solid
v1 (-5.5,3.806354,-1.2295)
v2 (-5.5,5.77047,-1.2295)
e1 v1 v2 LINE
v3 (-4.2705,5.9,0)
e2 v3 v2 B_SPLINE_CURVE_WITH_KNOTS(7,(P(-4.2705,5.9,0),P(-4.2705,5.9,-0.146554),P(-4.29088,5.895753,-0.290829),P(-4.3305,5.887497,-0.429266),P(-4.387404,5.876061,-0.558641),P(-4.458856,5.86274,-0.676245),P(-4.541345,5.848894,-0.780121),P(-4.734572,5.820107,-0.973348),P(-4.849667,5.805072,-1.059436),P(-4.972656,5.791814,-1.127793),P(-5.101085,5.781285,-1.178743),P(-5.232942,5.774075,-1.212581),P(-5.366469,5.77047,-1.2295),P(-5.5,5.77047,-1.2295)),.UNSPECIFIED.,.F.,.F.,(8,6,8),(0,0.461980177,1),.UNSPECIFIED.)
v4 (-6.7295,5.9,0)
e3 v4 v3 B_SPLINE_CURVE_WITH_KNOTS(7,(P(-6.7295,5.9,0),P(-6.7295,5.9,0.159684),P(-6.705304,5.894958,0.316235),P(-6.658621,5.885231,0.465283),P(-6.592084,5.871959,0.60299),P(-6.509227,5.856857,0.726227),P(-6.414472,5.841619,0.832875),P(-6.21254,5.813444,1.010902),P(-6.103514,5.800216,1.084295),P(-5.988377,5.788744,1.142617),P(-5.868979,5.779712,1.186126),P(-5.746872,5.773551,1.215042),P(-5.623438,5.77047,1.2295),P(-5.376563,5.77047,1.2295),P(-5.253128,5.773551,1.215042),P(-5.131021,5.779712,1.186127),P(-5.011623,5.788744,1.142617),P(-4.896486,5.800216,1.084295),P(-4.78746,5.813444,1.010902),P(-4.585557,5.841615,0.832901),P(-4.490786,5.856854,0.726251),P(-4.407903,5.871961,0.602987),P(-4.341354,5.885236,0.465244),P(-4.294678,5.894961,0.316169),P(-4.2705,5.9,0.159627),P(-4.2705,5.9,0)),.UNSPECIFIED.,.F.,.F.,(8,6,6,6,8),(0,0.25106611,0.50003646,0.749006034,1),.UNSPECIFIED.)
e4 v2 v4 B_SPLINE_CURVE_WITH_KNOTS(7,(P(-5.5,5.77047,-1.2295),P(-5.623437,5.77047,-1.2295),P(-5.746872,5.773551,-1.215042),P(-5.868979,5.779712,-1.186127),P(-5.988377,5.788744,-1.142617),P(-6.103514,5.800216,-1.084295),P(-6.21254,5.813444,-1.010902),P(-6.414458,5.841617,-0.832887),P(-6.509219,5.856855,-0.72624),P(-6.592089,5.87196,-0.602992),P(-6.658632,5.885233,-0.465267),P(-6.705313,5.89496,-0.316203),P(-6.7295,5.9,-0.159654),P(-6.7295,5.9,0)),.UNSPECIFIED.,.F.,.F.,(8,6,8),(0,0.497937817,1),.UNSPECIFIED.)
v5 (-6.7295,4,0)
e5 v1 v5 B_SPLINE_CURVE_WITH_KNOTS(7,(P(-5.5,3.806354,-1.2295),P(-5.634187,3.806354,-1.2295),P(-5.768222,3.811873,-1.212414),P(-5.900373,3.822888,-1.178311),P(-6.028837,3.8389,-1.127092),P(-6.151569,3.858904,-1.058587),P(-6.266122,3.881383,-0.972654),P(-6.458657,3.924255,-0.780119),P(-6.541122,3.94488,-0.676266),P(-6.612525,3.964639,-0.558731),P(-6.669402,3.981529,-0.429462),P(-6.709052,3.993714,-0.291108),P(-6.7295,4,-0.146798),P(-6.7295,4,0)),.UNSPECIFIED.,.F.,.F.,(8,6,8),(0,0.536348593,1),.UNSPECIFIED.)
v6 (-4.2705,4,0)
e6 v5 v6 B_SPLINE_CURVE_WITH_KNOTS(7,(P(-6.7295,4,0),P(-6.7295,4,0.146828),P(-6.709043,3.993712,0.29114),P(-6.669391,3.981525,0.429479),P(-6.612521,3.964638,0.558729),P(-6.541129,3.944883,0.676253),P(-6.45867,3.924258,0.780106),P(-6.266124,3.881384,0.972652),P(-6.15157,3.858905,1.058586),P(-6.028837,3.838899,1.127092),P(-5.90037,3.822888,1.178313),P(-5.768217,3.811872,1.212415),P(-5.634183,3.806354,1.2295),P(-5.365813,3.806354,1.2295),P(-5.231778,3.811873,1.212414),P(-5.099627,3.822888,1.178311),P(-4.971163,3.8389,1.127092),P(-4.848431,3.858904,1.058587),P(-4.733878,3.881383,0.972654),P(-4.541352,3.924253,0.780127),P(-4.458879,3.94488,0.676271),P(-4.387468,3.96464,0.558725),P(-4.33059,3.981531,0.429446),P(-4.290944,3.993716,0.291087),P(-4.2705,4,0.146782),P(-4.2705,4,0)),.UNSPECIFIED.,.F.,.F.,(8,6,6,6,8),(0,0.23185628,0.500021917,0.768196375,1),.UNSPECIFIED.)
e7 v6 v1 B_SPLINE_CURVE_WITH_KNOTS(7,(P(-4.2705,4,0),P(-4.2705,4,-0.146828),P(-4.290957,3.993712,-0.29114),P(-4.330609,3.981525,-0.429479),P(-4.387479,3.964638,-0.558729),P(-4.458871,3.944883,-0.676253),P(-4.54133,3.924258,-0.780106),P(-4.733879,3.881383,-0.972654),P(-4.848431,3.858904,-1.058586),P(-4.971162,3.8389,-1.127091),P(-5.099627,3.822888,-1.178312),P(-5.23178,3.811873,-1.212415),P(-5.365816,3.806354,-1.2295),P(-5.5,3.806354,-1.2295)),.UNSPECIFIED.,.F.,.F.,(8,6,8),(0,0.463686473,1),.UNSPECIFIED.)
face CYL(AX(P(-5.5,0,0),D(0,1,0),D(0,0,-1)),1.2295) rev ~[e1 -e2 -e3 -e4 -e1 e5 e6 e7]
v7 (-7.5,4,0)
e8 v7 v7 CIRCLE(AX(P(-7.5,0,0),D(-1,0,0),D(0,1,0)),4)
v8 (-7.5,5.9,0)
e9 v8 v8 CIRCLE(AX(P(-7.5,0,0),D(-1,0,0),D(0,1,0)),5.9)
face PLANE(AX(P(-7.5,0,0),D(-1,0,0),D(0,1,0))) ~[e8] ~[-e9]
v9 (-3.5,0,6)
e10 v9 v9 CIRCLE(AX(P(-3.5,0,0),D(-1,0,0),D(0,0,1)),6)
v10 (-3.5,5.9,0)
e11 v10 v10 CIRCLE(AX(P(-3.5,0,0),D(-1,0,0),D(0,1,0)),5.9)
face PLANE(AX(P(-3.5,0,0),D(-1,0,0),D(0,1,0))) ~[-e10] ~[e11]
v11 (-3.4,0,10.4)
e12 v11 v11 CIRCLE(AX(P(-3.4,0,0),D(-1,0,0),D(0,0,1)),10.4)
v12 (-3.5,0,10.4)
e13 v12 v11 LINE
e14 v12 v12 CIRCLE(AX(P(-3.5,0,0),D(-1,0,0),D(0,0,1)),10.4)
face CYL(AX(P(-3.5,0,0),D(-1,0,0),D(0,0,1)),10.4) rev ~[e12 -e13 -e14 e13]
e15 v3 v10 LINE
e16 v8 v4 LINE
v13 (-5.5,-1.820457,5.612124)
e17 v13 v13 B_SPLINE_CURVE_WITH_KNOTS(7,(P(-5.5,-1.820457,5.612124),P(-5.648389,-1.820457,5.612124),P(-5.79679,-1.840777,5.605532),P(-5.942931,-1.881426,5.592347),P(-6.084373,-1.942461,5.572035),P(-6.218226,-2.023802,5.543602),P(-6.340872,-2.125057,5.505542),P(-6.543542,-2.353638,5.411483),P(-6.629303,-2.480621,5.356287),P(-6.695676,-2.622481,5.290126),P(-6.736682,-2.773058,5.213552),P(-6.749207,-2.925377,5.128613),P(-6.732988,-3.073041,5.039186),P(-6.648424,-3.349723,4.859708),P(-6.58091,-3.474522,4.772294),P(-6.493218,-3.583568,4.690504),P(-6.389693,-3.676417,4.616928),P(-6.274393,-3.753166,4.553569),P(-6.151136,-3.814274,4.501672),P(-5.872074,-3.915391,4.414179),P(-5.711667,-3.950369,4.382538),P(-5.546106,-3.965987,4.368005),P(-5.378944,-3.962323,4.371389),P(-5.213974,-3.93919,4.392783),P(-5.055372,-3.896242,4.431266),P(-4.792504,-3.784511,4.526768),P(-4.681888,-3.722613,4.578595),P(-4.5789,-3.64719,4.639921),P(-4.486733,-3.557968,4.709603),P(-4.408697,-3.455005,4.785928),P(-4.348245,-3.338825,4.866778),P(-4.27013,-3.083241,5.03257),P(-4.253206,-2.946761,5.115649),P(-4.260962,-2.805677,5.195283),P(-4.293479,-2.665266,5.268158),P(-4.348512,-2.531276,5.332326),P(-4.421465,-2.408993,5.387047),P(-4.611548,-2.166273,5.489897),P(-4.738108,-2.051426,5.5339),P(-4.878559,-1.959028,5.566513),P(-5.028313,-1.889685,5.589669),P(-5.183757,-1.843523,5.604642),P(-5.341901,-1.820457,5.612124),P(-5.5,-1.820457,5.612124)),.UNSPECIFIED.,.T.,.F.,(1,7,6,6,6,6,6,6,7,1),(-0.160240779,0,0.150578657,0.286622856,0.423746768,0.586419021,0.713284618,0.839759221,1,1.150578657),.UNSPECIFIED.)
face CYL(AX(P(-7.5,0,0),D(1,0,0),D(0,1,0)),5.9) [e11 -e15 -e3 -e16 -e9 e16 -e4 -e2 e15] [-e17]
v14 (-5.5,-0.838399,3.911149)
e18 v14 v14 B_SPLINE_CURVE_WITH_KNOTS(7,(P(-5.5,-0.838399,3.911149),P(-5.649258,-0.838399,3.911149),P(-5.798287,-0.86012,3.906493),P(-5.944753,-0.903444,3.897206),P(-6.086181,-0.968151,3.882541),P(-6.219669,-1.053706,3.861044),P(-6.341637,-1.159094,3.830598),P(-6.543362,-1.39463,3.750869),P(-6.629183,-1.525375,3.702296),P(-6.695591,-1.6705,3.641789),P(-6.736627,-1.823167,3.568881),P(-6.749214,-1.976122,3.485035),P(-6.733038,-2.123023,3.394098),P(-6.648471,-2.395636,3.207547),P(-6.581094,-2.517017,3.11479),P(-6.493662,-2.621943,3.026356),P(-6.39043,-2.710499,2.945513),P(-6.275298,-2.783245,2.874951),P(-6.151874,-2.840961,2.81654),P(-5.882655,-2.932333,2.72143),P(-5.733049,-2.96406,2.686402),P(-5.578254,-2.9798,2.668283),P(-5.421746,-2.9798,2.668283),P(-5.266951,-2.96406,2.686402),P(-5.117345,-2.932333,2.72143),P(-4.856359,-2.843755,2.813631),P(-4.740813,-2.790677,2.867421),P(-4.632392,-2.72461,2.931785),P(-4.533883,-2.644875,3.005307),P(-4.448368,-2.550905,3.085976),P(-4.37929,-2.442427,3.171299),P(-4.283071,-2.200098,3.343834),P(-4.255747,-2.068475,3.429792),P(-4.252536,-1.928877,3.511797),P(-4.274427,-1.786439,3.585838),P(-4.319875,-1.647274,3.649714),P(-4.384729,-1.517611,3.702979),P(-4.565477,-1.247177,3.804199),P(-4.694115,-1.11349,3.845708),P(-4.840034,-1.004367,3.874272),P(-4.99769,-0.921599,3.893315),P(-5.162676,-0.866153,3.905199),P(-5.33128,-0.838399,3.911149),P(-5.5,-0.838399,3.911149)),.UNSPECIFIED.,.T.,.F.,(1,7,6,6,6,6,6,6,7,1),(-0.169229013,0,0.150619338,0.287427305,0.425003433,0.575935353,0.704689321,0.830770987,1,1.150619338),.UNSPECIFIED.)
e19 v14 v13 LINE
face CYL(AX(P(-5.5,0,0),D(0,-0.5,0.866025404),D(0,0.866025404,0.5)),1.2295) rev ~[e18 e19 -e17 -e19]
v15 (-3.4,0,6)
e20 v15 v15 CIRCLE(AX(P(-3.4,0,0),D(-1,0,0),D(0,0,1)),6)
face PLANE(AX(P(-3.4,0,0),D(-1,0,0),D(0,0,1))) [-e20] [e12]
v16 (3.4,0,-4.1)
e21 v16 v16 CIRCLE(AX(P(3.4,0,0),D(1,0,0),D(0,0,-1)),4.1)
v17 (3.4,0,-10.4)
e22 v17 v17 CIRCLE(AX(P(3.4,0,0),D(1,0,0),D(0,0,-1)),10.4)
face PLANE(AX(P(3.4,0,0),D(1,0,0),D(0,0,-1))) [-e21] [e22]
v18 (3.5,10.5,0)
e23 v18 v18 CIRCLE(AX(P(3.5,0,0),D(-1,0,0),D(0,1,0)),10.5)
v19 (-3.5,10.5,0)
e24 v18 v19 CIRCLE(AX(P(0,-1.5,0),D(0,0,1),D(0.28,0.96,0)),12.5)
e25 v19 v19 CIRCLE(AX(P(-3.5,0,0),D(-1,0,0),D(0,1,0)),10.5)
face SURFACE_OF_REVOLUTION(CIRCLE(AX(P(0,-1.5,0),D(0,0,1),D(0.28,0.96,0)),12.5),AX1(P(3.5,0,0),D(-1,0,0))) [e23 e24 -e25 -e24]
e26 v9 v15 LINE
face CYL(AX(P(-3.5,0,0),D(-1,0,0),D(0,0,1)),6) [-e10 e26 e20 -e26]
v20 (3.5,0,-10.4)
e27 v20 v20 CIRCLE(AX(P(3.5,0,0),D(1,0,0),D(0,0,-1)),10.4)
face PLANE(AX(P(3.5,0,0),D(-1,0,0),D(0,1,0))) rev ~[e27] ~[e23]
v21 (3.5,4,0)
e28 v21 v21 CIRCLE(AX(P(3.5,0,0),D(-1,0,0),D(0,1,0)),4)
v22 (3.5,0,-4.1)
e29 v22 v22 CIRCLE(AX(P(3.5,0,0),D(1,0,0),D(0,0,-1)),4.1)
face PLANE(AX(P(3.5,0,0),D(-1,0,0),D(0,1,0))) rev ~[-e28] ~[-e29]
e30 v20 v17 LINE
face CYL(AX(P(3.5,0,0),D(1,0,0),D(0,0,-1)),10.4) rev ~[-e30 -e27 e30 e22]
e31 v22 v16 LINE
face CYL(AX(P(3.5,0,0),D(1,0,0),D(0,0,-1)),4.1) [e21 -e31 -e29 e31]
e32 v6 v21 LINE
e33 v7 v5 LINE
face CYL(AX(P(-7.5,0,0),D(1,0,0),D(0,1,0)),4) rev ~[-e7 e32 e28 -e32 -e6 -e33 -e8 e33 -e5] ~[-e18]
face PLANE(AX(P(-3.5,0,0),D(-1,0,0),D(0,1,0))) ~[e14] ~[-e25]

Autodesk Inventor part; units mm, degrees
ref_plane "YZ Plane" through (0, 0, 0) normal (1, 0, 0) x (0, 1, 0)
ref_plane "XZ Plane" through (0, 0, 0) normal (0, 1, 0) x (-1, 0, 0)
ref_plane "XY Plane" through (0, 0, 0) normal (0, 0, 1) x (1, 0, 0)
sketch "Sketch2" plane through (0, 0, 0) normal (0, 0, 1) x (1, 0, 0)
  arc A0 (3.5, 10.5) -> (-3.5, 10.5) centre (0, -1.5) ccw
  line L0 (3.5, 10.5) -> (3.5, 4)
  line L1 (3.5, 0) -> (-7.5, 0)
  line L2 (-7.5, 5.9) -> (-3.5, 5.9)
  line L3 (-3.5, 5.9) -> (-3.5, 10.5)
  line L4 (-7.5, 4) -> (3.5, 4)
  line L5 (-7.5, 4) -> (-7.5, 5.9)
  point P0 (0, 0)
  point P1 (0, 11)
  point P2 (-7.5, 4.95)
  dimension "d1" = 11
  dimension "d2" = 3.5
  dimension "d3" = 10.5
  dimension "d4" = 3.5
  dimension "d5" = 5.9
  dimension "d6" = 11
  dimension "d7" = 4
revolve "Revolution1" add sketch "Sketch2" angle 360 about axis through (3.5, 0, 0) along (-1, 0, 0)
sketch "Sketch3" plane through (0, 0, 0) normal (0, 1, 0) x (-1, 0, 0)
  line L0 (7.5, 5.9) -> (7.5, -5.9) projected
  line L1 (3.5, 5.9) -> (3.5, -5.9) projected
  point P0 (0, 0)
  point P1 (5.5, 0)
  dimension "d9" = 2
hole "Hole1" at (-5.5, 0, 0) direction (0, 1, 0) diameter 2.459 end through all thread size "M3x0.5" class "6H" standard "ISO Metric profile"
pattern_circular "Circular Pattern1" count 2 over 120 about axis through (-2, 0, 0) along (1, 0, 0) of "Hole1"
sketch "Sketch4" plane through (-3.5, 0, 0) normal (-1, 0, 0) x (0, 0, 1)
  circle A0 centre (0, 0) radius 5.9 projected
  circle A1 centre (0, 0) radius 10.5 projected
  circle A2 centre (0, 0) radius 6
  circle A3 centre (0, 0) radius 10.4
  point P0 (0, 0)
  dimension "d20" = 0.1
  dimension "d21" = 0.1
sketch "Sketch4 outline for Extrusion1" plane through (-3.5, 0, 0) normal (-1, 0, 0) x (0, 0, 1)
  circle A0 centre (0, 0) radius 10.4
  circle A1 centre (0, 0) radius 6
extrude "Extrusion1" cut sketch "Sketch4 outline for Extrusion1" against normal blind 0.1
sketch "Sketch5" plane through (3.5, 0, 0) normal (1, 0, 0) x (0, 0, -1)
  circle A0 centre (0, 0) radius 10.5 projected
  circle A1 centre (0, 0) radius 4 projected
  circle A2 centre (0, 0) radius 10.4
  circle A3 centre (0, 0) radius 4.1
  point P0 (0, 0)
  dimension "d24" = 0.1
  dimension "d25" = 0.1
sketch "Sketch5 outline for Extrusion2" plane through (3.5, 0, 0) normal (1, 0, 0) x (0, 0, -1)
  circle A0 centre (0, 0) radius 10.4
  circle A1 centre (0, 0) radius 4.1
extrude "Extrusion2" cut sketch "Sketch5 outline for Extrusion2" against normal blind 0.1
equation "\"d4\" = d2"
properties part number "conische lager" material "Stainless Steel"
